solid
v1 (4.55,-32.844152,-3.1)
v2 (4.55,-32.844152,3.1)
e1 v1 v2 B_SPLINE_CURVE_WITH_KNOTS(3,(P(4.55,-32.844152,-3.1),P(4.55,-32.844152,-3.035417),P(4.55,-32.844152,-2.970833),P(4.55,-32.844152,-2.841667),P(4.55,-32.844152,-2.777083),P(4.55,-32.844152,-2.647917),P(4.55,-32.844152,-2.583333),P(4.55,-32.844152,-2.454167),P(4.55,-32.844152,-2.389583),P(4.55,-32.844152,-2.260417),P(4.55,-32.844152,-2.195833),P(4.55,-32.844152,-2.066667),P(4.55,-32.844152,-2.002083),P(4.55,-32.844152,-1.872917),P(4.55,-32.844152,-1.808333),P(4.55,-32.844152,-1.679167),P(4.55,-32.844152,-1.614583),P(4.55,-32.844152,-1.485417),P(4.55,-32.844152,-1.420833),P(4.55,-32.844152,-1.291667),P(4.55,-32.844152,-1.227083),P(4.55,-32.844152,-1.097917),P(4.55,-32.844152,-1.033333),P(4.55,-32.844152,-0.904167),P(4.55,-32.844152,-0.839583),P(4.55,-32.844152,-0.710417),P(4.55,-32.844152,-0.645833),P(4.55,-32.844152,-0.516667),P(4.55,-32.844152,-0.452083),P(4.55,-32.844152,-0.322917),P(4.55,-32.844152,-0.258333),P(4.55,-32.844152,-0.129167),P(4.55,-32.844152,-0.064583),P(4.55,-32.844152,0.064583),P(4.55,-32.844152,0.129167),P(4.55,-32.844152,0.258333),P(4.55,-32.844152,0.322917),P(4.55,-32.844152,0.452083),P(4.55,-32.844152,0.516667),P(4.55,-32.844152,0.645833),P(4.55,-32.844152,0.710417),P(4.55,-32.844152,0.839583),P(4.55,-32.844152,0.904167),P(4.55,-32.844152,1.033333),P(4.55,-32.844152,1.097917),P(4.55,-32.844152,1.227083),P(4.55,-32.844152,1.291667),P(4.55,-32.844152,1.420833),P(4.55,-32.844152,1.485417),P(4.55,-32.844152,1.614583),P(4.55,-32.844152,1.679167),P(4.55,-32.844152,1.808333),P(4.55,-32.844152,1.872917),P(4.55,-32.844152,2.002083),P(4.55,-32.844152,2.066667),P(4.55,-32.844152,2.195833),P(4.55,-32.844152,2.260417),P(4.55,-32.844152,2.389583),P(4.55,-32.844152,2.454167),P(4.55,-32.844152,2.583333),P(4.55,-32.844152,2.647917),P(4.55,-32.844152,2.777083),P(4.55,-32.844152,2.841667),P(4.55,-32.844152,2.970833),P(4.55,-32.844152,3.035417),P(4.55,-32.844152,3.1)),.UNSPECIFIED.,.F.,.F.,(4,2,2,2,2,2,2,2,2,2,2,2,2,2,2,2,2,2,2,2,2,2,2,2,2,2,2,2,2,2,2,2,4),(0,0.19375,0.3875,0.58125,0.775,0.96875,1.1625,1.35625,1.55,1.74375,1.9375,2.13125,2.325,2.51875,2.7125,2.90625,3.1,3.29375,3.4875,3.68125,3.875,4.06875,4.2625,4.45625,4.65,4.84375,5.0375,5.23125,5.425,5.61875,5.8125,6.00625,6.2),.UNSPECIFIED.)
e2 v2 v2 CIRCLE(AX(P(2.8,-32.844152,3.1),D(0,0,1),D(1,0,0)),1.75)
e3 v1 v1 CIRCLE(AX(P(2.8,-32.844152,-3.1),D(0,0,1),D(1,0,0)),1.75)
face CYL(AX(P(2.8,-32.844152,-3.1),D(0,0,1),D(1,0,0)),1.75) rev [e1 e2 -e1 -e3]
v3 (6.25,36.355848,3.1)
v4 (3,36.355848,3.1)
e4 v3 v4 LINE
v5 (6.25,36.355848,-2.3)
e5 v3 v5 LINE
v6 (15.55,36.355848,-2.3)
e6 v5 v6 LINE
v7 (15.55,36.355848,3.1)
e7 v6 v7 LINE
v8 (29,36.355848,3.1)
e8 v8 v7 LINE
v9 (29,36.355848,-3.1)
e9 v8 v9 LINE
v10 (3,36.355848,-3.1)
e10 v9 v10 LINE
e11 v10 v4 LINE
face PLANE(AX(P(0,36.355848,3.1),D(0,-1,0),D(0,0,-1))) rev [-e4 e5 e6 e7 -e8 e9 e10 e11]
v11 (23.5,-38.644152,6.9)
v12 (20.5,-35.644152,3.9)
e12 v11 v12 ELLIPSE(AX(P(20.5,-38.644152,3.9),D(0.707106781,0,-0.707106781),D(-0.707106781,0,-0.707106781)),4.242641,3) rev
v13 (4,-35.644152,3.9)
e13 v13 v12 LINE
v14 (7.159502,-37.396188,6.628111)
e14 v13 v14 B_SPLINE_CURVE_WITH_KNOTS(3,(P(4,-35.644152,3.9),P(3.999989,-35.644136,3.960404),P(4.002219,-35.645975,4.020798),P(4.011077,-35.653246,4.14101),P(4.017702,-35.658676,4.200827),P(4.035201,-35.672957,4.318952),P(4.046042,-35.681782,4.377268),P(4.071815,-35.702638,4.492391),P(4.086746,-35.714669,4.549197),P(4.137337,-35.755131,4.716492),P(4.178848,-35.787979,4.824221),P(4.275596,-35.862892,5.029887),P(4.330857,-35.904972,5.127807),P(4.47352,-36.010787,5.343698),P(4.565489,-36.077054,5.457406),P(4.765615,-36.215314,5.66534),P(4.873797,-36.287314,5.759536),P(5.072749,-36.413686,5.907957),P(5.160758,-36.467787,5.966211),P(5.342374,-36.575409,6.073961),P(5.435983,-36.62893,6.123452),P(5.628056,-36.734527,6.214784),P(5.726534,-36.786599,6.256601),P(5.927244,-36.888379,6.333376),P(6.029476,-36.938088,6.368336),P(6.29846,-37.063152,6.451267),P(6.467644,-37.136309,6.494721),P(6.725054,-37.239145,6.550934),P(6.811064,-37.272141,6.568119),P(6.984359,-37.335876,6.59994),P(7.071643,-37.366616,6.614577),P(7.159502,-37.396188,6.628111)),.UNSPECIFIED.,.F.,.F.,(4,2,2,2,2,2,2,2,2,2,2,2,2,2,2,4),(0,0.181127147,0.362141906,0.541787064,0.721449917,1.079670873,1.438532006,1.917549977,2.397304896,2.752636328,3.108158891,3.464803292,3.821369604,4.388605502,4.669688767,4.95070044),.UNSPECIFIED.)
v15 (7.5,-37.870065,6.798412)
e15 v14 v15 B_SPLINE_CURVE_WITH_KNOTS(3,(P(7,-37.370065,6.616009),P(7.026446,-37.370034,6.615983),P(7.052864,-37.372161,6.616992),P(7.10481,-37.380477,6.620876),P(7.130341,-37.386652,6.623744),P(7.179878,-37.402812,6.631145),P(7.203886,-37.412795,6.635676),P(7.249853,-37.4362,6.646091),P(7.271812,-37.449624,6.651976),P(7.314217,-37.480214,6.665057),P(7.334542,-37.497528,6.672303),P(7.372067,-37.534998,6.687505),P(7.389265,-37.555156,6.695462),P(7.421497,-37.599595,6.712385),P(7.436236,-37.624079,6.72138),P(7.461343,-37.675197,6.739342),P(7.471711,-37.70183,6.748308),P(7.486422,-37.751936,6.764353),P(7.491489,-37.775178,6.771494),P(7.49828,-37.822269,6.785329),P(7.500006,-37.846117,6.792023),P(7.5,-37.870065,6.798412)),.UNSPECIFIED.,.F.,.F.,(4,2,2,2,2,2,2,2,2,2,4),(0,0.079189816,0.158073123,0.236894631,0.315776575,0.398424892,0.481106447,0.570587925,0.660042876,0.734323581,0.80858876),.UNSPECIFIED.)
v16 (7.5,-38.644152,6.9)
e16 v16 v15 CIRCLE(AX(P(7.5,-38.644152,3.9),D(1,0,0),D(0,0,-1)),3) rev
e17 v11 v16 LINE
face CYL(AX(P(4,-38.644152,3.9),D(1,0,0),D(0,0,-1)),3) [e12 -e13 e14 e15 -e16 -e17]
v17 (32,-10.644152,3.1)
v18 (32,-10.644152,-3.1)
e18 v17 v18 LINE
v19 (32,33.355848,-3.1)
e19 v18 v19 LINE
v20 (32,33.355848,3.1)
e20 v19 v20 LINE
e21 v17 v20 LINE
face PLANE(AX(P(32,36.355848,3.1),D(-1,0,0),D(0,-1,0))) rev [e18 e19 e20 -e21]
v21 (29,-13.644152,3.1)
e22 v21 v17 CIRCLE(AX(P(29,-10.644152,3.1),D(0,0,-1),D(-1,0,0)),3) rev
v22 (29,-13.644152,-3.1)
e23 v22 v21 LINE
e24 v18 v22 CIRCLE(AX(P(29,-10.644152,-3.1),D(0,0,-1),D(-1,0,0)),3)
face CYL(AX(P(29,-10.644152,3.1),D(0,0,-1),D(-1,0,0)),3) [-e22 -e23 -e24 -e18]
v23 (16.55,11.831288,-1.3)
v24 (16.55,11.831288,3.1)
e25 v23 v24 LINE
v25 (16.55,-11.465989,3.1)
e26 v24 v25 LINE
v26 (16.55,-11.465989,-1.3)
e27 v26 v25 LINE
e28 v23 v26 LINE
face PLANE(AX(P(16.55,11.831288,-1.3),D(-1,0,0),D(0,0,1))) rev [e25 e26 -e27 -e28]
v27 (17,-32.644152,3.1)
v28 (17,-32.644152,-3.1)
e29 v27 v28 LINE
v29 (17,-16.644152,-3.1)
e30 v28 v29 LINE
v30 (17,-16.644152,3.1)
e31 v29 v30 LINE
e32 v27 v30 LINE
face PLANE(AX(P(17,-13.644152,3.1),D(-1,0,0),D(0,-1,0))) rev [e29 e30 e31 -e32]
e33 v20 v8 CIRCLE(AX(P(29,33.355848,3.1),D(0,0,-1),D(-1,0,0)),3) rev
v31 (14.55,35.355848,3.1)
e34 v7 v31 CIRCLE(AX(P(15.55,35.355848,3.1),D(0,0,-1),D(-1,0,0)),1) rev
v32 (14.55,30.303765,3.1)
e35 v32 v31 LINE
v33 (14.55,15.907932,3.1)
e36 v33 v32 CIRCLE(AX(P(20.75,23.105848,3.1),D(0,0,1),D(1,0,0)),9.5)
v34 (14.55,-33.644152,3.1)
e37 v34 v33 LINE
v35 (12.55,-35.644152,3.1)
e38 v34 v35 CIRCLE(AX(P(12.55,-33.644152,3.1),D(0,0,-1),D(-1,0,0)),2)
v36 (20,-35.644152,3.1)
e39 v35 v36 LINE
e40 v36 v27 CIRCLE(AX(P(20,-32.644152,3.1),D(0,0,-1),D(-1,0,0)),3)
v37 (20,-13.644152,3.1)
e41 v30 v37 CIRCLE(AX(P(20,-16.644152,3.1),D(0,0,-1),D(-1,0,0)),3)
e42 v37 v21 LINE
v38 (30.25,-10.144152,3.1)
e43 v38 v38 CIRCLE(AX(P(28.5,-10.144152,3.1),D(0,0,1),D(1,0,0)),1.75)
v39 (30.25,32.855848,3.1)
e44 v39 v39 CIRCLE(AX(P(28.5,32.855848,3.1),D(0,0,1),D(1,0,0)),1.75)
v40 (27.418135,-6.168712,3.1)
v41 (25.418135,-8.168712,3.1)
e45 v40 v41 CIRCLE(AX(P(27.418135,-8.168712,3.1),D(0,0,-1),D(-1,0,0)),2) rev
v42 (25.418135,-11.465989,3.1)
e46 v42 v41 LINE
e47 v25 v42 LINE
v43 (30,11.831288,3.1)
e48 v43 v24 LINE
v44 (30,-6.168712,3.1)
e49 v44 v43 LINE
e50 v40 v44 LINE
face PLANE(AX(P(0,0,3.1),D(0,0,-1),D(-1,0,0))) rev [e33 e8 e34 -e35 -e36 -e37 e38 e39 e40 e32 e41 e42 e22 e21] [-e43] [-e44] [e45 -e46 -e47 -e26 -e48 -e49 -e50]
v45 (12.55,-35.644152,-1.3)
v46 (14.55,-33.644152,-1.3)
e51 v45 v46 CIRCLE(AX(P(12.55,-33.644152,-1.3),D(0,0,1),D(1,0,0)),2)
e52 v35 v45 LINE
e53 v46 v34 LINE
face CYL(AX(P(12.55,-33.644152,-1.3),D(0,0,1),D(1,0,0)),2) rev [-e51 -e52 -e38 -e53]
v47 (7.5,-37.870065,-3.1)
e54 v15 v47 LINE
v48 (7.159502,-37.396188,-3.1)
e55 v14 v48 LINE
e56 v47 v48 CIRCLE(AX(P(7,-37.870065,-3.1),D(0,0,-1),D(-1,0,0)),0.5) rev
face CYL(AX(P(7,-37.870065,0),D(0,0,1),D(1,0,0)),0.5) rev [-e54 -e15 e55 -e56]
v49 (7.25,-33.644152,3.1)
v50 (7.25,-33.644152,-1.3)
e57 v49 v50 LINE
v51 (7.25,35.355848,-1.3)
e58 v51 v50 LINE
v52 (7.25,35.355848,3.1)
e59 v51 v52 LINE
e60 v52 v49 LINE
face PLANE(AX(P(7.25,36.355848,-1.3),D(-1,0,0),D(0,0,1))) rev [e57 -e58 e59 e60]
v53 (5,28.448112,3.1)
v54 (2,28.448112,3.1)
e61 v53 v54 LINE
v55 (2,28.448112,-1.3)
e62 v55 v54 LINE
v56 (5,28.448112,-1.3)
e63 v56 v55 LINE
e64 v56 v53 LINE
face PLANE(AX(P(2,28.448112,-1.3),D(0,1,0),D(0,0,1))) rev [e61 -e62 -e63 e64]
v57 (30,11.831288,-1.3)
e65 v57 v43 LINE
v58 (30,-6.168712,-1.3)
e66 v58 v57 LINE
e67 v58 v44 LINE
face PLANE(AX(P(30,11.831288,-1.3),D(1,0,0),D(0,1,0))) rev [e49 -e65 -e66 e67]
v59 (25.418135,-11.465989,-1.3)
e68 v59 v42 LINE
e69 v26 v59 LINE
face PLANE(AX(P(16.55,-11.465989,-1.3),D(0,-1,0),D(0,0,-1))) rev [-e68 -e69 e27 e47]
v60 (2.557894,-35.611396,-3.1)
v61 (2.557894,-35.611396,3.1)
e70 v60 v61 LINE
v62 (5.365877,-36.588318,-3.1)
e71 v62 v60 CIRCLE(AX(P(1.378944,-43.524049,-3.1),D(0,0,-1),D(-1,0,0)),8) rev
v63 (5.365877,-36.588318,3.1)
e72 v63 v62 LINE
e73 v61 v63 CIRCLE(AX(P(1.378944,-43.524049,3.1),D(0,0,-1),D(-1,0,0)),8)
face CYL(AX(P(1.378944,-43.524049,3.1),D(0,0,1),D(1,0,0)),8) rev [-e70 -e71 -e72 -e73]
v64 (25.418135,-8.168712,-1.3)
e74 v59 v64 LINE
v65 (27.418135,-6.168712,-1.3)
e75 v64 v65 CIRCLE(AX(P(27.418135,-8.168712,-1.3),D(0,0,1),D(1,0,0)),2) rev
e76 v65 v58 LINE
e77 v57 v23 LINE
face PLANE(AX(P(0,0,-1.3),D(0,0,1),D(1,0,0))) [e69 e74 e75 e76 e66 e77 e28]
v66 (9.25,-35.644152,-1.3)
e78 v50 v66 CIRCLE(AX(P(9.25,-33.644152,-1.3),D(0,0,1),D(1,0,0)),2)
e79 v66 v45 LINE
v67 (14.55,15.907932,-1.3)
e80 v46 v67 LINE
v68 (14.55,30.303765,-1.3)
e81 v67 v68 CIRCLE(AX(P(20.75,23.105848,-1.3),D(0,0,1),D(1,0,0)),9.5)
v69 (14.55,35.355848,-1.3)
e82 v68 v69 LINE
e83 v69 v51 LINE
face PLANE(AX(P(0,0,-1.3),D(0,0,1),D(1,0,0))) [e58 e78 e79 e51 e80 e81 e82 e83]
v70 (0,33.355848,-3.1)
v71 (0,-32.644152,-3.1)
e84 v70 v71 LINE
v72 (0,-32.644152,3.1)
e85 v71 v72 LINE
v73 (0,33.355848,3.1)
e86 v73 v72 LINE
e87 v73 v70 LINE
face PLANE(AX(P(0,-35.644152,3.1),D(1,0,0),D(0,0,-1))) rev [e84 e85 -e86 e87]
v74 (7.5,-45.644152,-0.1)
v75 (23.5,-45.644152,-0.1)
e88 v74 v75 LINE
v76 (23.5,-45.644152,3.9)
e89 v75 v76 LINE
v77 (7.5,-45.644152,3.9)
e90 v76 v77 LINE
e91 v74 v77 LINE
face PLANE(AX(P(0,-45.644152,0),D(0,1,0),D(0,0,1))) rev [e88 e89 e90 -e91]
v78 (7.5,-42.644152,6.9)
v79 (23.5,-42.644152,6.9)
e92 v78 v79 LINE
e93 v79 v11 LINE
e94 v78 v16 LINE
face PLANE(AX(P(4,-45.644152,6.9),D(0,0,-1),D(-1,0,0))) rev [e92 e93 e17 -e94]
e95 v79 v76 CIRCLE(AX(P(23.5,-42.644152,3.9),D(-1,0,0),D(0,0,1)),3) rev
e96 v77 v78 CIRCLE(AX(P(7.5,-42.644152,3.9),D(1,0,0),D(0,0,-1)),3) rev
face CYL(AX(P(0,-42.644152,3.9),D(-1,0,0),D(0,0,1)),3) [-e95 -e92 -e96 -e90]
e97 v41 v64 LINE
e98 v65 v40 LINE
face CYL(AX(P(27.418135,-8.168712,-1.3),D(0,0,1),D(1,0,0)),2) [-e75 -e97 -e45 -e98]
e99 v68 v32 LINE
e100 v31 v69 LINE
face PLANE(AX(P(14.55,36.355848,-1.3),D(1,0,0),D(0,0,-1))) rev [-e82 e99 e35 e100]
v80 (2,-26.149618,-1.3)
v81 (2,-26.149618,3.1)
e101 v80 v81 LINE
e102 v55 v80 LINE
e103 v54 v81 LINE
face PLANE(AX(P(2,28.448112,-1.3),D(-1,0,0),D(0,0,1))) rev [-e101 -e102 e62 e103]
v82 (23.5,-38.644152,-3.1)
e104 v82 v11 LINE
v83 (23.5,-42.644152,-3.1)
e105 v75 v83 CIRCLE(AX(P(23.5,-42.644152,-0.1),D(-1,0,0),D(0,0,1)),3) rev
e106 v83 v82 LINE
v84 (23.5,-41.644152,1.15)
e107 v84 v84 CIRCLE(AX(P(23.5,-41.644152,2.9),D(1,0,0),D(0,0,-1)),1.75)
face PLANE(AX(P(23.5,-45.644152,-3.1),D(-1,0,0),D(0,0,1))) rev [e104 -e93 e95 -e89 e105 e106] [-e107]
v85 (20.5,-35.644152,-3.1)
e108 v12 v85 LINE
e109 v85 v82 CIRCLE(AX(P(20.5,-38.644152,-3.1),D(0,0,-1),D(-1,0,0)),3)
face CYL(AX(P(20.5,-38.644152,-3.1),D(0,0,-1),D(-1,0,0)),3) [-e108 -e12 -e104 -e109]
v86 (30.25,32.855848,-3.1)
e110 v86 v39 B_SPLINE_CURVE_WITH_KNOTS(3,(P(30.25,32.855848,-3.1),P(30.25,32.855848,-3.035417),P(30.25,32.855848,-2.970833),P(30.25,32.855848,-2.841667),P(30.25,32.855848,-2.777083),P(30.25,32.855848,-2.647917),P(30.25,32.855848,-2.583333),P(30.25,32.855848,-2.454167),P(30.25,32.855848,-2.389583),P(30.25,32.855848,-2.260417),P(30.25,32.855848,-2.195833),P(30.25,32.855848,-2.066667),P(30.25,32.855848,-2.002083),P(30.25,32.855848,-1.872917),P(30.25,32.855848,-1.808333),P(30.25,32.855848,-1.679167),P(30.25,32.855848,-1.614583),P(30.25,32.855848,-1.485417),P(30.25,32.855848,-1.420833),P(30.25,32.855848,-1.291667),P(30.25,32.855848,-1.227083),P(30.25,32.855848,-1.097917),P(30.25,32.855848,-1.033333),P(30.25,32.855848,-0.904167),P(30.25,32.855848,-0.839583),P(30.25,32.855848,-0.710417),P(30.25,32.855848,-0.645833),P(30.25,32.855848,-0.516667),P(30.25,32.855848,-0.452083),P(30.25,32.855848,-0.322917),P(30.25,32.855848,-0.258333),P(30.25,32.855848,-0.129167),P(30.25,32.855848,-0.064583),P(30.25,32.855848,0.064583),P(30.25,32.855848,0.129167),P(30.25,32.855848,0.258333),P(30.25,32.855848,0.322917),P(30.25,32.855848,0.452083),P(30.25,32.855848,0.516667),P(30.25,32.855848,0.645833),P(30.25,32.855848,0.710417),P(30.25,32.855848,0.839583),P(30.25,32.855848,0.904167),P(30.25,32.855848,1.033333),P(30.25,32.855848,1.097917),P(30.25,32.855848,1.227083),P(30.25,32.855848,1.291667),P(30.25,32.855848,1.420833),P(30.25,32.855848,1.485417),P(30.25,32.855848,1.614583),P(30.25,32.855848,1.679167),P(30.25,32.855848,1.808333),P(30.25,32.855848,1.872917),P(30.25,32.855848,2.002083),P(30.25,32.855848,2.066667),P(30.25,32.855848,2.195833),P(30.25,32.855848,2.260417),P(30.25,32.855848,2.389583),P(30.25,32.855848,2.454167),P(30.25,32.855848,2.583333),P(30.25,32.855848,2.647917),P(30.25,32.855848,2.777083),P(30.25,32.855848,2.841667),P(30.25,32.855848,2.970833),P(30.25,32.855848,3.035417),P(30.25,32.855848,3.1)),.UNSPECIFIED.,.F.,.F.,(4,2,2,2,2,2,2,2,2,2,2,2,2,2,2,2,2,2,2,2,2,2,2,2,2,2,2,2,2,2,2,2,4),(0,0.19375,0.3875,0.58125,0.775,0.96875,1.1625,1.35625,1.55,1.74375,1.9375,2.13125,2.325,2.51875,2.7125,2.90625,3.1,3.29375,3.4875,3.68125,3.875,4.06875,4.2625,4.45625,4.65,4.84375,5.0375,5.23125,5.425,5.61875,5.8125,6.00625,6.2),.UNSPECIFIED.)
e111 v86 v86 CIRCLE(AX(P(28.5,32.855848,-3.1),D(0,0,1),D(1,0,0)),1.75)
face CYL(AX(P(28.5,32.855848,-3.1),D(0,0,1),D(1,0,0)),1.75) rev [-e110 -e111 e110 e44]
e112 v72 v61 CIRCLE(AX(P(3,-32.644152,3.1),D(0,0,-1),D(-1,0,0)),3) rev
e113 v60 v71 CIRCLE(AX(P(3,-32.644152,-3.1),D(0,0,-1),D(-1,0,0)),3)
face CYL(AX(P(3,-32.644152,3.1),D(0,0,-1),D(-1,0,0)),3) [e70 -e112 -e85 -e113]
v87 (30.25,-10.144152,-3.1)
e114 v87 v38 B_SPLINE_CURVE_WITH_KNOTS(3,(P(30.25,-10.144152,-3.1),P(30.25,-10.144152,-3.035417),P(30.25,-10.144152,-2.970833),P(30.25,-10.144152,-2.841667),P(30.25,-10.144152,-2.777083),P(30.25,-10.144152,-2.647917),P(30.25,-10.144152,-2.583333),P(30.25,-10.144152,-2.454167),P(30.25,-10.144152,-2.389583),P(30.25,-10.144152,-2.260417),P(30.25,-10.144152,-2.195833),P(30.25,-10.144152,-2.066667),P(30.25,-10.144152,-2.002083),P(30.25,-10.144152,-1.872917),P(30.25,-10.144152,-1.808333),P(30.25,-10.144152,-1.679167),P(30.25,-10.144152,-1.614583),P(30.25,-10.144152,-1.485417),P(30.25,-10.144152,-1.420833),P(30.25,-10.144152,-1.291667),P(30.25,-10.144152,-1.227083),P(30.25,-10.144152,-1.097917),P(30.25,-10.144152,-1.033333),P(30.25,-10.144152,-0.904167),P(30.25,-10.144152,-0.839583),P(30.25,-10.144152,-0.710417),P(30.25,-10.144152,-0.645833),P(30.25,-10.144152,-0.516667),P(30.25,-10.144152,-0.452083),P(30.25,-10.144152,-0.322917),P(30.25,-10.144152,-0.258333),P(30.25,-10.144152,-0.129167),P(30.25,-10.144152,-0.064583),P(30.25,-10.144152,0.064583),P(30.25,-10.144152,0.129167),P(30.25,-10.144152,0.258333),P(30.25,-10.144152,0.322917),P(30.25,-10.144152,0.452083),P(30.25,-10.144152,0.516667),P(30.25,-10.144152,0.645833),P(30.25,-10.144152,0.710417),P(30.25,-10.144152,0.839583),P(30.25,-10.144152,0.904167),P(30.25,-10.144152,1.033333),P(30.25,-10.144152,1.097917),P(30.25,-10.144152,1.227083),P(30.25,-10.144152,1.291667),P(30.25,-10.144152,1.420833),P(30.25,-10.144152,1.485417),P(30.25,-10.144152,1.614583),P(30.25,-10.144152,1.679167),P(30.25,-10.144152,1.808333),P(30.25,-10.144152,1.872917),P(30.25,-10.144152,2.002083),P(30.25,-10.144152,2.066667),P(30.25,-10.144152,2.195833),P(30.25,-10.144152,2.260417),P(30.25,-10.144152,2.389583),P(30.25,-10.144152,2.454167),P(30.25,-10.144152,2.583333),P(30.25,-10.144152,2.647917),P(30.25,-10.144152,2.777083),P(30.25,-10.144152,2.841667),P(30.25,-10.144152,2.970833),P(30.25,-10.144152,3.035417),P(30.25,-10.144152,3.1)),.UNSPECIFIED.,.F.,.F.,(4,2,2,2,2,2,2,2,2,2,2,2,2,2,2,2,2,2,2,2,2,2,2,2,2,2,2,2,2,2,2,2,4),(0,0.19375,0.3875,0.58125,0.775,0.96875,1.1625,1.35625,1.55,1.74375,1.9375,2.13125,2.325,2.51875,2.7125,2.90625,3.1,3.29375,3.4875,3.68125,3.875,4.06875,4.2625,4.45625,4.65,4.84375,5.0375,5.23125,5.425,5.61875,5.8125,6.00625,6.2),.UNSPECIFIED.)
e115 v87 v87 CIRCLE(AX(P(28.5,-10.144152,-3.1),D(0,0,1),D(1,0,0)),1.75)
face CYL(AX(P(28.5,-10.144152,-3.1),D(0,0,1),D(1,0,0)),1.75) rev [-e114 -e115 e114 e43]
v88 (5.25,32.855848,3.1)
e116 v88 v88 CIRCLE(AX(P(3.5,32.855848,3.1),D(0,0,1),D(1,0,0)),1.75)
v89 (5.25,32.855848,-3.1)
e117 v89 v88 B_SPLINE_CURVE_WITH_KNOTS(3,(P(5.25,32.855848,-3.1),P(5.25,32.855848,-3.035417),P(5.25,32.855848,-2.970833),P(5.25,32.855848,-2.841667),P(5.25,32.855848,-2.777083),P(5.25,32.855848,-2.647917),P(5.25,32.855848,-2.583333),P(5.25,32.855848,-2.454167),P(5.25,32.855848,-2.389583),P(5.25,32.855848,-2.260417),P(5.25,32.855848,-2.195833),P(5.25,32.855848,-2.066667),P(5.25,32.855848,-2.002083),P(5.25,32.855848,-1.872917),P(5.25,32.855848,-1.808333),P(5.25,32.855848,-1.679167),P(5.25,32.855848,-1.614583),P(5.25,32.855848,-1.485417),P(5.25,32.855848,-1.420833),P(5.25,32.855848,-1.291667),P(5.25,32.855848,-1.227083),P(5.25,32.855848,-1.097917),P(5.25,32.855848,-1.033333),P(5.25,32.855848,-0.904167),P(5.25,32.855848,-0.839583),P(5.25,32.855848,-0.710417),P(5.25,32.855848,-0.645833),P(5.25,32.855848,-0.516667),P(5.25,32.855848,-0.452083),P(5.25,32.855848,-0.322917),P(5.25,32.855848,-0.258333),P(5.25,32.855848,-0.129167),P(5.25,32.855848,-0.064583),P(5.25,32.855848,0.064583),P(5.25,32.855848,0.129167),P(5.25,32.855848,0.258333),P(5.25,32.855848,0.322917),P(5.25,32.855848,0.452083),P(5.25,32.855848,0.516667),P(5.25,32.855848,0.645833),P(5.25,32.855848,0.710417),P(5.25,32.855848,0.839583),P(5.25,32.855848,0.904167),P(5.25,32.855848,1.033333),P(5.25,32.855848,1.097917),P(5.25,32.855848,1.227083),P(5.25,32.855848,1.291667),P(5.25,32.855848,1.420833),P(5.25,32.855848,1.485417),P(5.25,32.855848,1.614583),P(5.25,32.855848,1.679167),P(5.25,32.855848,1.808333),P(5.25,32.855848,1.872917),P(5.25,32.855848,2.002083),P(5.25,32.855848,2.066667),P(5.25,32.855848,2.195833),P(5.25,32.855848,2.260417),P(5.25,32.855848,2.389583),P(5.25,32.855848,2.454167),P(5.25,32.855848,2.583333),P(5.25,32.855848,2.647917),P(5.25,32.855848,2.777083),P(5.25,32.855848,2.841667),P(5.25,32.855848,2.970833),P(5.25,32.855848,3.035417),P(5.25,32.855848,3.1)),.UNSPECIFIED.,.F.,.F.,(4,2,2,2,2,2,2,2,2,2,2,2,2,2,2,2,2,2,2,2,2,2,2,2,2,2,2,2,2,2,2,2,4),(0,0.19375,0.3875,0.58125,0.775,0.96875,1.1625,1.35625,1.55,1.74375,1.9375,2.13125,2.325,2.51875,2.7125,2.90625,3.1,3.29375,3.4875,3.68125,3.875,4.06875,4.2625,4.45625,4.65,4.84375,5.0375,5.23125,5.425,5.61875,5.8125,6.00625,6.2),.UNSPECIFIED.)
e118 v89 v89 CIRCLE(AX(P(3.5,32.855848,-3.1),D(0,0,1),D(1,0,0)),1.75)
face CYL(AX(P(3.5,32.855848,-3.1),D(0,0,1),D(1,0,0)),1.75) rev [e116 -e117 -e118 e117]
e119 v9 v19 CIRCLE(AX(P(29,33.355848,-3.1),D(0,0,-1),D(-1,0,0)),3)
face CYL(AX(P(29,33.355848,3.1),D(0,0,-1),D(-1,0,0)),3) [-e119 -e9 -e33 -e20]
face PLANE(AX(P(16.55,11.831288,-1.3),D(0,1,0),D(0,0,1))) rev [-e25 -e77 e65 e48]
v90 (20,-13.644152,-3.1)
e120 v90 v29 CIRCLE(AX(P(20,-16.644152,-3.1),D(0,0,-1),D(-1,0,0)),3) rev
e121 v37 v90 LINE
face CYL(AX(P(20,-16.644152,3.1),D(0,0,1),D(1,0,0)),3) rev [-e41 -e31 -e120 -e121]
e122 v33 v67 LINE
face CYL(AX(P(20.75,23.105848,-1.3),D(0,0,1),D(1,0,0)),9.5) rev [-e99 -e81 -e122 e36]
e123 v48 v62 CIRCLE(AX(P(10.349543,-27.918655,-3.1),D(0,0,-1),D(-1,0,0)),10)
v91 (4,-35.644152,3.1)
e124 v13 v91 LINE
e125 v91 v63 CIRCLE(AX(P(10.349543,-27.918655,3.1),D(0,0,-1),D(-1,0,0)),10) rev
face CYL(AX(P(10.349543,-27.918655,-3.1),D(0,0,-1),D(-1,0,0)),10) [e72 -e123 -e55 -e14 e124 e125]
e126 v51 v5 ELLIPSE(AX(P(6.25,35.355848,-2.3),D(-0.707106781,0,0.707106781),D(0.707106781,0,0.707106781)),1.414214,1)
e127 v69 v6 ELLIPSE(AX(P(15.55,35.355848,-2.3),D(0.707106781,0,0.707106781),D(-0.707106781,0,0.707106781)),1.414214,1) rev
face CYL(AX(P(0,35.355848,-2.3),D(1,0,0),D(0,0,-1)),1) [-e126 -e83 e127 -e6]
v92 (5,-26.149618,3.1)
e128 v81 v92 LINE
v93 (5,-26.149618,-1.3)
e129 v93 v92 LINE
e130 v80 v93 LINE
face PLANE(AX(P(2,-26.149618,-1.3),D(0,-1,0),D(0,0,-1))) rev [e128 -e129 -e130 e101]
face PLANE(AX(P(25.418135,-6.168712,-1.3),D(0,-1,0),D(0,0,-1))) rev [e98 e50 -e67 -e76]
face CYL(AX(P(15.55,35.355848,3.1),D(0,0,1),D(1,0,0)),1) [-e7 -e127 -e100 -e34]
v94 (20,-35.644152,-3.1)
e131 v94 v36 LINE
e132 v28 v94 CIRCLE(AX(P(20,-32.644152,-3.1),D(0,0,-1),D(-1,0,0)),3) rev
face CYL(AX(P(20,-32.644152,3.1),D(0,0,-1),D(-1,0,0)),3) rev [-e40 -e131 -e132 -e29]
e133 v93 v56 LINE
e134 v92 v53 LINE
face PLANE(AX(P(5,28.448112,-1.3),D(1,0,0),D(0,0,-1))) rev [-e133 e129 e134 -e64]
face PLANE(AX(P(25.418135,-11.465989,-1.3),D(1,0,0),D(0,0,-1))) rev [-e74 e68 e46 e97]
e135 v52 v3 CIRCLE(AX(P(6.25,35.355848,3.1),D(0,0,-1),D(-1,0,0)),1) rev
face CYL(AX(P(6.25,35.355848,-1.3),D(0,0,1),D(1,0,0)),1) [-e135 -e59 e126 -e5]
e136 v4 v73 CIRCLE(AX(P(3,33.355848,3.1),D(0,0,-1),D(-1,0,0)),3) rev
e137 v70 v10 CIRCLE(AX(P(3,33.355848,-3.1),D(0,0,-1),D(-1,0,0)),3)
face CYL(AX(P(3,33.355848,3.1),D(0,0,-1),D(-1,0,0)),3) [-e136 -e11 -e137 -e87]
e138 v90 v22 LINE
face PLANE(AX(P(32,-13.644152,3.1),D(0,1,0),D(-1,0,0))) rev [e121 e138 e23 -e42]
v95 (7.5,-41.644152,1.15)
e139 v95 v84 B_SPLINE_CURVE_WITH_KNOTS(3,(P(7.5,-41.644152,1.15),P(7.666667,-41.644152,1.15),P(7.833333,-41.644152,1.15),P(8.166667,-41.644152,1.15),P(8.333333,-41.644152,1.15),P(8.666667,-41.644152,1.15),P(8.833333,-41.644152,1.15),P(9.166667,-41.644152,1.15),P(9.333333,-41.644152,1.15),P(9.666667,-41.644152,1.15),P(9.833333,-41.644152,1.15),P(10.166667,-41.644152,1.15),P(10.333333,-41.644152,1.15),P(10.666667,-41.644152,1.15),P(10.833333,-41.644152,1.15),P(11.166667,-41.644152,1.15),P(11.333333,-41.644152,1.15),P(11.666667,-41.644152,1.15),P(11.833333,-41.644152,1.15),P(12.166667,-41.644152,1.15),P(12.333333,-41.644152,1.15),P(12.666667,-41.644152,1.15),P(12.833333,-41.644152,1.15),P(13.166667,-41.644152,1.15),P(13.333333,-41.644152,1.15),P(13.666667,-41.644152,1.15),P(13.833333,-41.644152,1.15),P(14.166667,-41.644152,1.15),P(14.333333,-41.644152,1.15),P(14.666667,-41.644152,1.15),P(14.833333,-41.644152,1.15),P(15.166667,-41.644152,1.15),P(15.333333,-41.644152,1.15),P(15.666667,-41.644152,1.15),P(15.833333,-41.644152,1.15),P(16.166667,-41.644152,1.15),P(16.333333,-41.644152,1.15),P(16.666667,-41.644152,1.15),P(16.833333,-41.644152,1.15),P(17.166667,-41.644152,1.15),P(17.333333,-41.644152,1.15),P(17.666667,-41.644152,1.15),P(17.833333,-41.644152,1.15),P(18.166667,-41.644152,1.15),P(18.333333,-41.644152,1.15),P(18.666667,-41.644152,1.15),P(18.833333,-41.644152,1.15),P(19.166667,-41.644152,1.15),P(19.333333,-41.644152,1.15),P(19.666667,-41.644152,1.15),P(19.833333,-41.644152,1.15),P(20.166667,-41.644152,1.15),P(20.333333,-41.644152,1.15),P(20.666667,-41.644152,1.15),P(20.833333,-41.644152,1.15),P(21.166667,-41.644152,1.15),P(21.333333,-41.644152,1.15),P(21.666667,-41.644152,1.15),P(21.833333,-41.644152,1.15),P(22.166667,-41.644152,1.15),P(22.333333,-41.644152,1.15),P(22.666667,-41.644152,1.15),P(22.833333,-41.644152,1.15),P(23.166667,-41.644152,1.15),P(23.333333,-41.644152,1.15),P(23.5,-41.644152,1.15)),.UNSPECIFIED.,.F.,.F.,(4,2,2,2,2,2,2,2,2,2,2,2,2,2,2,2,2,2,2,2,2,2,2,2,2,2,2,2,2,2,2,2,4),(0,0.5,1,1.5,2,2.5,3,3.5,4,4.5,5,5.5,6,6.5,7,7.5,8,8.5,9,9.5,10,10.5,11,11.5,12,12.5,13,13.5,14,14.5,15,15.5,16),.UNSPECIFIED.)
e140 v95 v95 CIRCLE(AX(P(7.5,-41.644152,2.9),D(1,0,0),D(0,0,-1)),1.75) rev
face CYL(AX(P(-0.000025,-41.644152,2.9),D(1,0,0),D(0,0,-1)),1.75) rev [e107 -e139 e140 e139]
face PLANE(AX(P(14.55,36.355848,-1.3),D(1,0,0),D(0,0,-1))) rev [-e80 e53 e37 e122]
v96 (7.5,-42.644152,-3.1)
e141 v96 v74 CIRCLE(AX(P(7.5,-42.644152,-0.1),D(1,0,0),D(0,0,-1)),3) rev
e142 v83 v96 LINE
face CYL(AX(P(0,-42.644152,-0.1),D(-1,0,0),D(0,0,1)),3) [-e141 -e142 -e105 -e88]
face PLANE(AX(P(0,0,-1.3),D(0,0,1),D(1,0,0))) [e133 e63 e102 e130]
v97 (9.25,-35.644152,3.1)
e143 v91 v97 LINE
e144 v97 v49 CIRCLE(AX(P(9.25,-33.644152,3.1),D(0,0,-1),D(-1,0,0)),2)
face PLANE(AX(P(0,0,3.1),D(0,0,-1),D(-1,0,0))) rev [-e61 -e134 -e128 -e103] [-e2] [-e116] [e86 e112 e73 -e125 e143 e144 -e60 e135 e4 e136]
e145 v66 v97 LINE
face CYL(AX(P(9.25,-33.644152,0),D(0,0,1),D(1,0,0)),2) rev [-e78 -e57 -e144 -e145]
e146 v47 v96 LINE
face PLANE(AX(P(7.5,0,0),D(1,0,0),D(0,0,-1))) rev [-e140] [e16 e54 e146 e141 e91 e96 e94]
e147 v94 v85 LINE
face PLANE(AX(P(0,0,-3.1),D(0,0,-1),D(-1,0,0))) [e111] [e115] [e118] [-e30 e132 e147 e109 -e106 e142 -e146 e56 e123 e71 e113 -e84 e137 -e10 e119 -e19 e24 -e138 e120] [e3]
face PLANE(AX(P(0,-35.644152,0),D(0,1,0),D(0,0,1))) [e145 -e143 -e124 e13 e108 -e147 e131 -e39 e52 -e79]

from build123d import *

# Parameters (mm, degrees)
BODY_DEPTH                      = 3.1
CHANNEL_W                       = 7.3
CHANNEL_H                       = 72
PIGIONCHANNEL_DEPTH             = 4.4
SKIZZE2_R                       = 1.75
SCREWS_DEPTH                    = 49.828144706
VERRUNDUNG1_R                   = 3
VERRUNDUNG2_R                   = 1
VERRUNDUNG3_R                   = 3
SKIZZE6_W                       = 19.5
SKIZZE6_H                       = 10
HANDLE_DEPTH                    = 10
SKIZZE7_R                       = 1.75
SCHNITT_LINEAR_AUSTRAGEN3_DEPTH = 52.800082742
SKIZZE8_W                       = 10
SKIZZE8_H                       = 8.274086909
SCHNITT_LINEAR_AUSTRAGEN4_DEPTH = 3.5
VERRUNDUNG7_R                   = 3
VERRUNDUNG8_R                   = 3
VERRUNDUNG12_R                  = 3
VERRUNDUNG13_R                  = 3
VERRUNDUNG14_R                  = 3
VERRUNDUNG16_R                  = 2
SKIZZE9_R                       = 9.5
GEAR_CAGE_DEPTH                 = 4.4
SCHNITT_LINEAR_AUSTRAGEN6_DEPTH = 4.4
VERRUNDUNG17_R                  = 2
SKIZZE11_W                      = 3
SKIZZE11_H                      = 54.597729832
SCHNITT_LINEAR_AUSTRAGEN7_DEPTH = 4.4
VERRUNDUNG18_R                  = 3
VERRUNDUNG19_R                  = 0.5
VERRUNDUNG20_START              = -4
VERRUNDUNG20_DEPTH              = 10.628110602
VERRUNDUNG22_START              = -3.1
VERRUNDUNG22_DEPTH              = 6.2


with BuildPart() as part:
    # body_sketch → body (new, symmetric)
    with BuildSketch(Plane.XY):
        Polygon((0, -35.644151565), (0, 36.355848435), (32, 36.355848435), (32, -13.644151565), (17, -13.644151565), (17, -35.644151565), align=None)
    extrude(amount=BODY_DEPTH, both=True)

    # channel → pigionchannel (cut)
    with BuildSketch(Plane.XY.offset(3.1)):
        with Locations((10.9, 0.355848435)):
            Rectangle(CHANNEL_W, CHANNEL_H)
    extrude(amount=-PIGIONCHANNEL_DEPTH, mode=Mode.SUBTRACT)

    # Skizze2 → screws (cut, through all)
    with BuildSketch(Plane.XY.offset(3.1)):
        with Locations((3.5, 32.855848435)):
            Circle(SKIZZE2_R)
        with Locations((28.5, 32.855848435)):
            Circle(SKIZZE2_R)
        with Locations((28.5, -10.144151565)):
            Circle(SKIZZE2_R)
        with Locations((2.8, -32.844151565)):
            Circle(SKIZZE2_R)
    extrude(amount=-SCREWS_DEPTH, mode=Mode.SUBTRACT)

    # Verrundung1
    verrundung1_edges = [part.edges().sort_by_distance(p)[0] for p in [
        (0, 36.355848435, 0),
        (32, 36.355848435, 0),
    ]]
    fillet(verrundung1_edges, radius=VERRUNDUNG1_R)

    # Verrundung2
    verrundung2_edges = [part.edges().sort_by_distance(p)[0] for p in [
        (14.55, 36.355848435, 0.9),
        (10.9, 36.355848435, -1.3),
        (7.25, 36.355848435, 0.9),
    ]]
    fillet(verrundung2_edges, radius=VERRUNDUNG2_R)

    # Verrundung3
    verrundung3_edges = [part.edges().sort_by_distance(p)[0] for p in [
        (32, -13.644151565, 0),
    ]]
    fillet(verrundung3_edges, radius=VERRUNDUNG3_R)

    # Skizze6 → handle (add)
    with BuildSketch(Plane.XZ.offset(35.644151565)):
        with Locations((13.75, 1.9)):
            Rectangle(SKIZZE6_W, SKIZZE6_H)
    extrude(amount=HANDLE_DEPTH)

    # Skizze7 → Schnitt-Linear austragen3 (cut, through all)
    with BuildSketch(Plane(origin=(23.5, 0, 0), x_dir=(0, 0, -1), z_dir=(1, 0, 0))):
        with Locations((-2.9, -41.644151565)):
            Circle(SKIZZE7_R)
    extrude(amount=-SCHNITT_LINEAR_AUSTRAGEN3_DEPTH, mode=Mode.SUBTRACT)

    # Skizze8 → Schnitt-Linear austragen4 (cut)
    with BuildSketch(Plane.ZY.offset(-4)):
        with Locations((1.9, -41.50710811)):
            Rectangle(SKIZZE8_W, SKIZZE8_H)
    extrude(amount=-SCHNITT_LINEAR_AUSTRAGEN4_DEPTH, mode=Mode.SUBTRACT)

    # Verrundung7
    verrundung7_edges = [part.edges().sort_by_distance(p)[0] for p in [
        (15.5, -45.644151565, 6.9),
    ]]
    fillet(verrundung7_edges, radius=VERRUNDUNG7_R)

    # Verrundung8
    verrundung8_edges = [part.edges().sort_by_distance(p)[0] for p in [
        (15.5, -45.644151565, -3.1),
    ]]
    fillet(verrundung8_edges, radius=VERRUNDUNG8_R)

    # Verrundung12
    verrundung12_edges = [part.edges().sort_by_distance(p)[0] for p in [
        (17, -13.644151565, 0),
    ]]
    fillet(verrundung12_edges, radius=VERRUNDUNG12_R)

    # Verrundung13
    verrundung13_edges = [part.edges().sort_by_distance(p)[0] for p in [
        (17, -35.644151565, 0),
    ]]
    fillet(verrundung13_edges, radius=VERRUNDUNG13_R)

    # Verrundung14
    verrundung14_edges = [part.edges().sort_by_distance(p)[0] for p in [
        (0, -35.644151565, 0),
    ]]
    fillet(verrundung14_edges, radius=VERRUNDUNG14_R)

    # Verrundung16
    verrundung16_edges = [part.edges().sort_by_distance(p)[0] for p in [
        (14.55, -35.644151565, 0.9),
        (7.25, -35.644151565, 0.9),
    ]]
    fillet(verrundung16_edges, radius=VERRUNDUNG16_R)

    # Skizze9 → gear cage (cut)
    with BuildSketch(Plane.XY.offset(3.1)):
        with Locations((20.75, 23.105848435)):
            Circle(SKIZZE9_R)
    extrude(amount=-GEAR_CAGE_DEPTH, mode=Mode.SUBTRACT)

    # Skizze10 → Schnitt-Linear austragen6 (cut)
    with BuildSketch(Plane.XY.offset(3.1)):
        Polygon((16.55, 11.83128846), (30, 11.83128846), (30, -6.16871154), (25.418135465, -6.16871154), (25.418135465, -11.465988975), (16.55, -11.465988975), align=None)
    extrude(amount=-SCHNITT_LINEAR_AUSTRAGEN6_DEPTH, mode=Mode.SUBTRACT)

    # Verrundung17
    verrundung17_edges = [part.edges().sort_by_distance(p)[0] for p in [
        (25.418135465, -6.16871154, 0.9),
    ]]
    fillet(verrundung17_edges, radius=VERRUNDUNG17_R)

    # Skizze11 → Schnitt-Linear austragen7 (cut)
    with BuildSketch(Plane.XY.offset(3.1)):
        with Locations((3.5, 1.149247054)):
            Rectangle(SKIZZE11_W, SKIZZE11_H)
    extrude(amount=-SCHNITT_LINEAR_AUSTRAGEN7_DEPTH, mode=Mode.SUBTRACT)

    # Verrundung18
    verrundung18_edges = [part.edges().sort_by_distance(p)[0] for p in [
        (13.75, -35.644151565, 6.9),
        (23.5, -35.644151565, 1.9),
    ]]
    fillet(verrundung18_edges, radius=VERRUNDUNG18_R)

    # Verrundung19
    verrundung19_edges = [part.edges().sort_by_distance(p)[0] for p in [
        (7.5, -37.370064656, 1.758004285),
    ]]
    fillet(verrundung19_edges, radius=VERRUNDUNG19_R)

    # Verrundung20: read off the stored shape, not the designer's step
    # Verrundung20 outline → Verrundung20 (cut)
    with BuildSketch(Plane.XY.offset(VERRUNDUNG20_START)):
        with BuildLine():
            ThreePointArc((7, -37.370064656), (7.080813571, -37.376638707), (7.159502052, -37.396187989))
            ThreePointArc((7.159502052, -37.396187989), (5.499970333, -36.664033092), (3.999994229, -35.644146822))
            Line((3.999994229, -35.644146822), (4, -37.370064656))
            Line((4, -37.370064656), (7, -37.370064656))
        make_face()
    extrude(amount=VERRUNDUNG20_DEPTH, mode=Mode.SUBTRACT)

    # Verrundung22: read off the stored shape, not the designer's step
    # Verrundung22 outline → Verrundung22 (add)
    with BuildSketch(Plane.XY.offset(VERRUNDUNG22_START)):
        with BuildLine():
            ThreePointArc((2.557893696, -35.611396418), (4.007665984, -35.968268897), (5.36587668, -36.588318377))
            ThreePointArc((5.36587668, -36.588318377), (4.663304696, -36.144631367), (3.999994229, -35.644146822))
            Line((3.999994229, -35.644146822), (3, -35.644151565))
            ThreePointArc((3, -35.644151565), (2.778340981, -35.635951572), (2.557893696, -35.611396418))
        make_face()
    extrude(amount=VERRUNDUNG22_DEPTH)


solid = part.part
